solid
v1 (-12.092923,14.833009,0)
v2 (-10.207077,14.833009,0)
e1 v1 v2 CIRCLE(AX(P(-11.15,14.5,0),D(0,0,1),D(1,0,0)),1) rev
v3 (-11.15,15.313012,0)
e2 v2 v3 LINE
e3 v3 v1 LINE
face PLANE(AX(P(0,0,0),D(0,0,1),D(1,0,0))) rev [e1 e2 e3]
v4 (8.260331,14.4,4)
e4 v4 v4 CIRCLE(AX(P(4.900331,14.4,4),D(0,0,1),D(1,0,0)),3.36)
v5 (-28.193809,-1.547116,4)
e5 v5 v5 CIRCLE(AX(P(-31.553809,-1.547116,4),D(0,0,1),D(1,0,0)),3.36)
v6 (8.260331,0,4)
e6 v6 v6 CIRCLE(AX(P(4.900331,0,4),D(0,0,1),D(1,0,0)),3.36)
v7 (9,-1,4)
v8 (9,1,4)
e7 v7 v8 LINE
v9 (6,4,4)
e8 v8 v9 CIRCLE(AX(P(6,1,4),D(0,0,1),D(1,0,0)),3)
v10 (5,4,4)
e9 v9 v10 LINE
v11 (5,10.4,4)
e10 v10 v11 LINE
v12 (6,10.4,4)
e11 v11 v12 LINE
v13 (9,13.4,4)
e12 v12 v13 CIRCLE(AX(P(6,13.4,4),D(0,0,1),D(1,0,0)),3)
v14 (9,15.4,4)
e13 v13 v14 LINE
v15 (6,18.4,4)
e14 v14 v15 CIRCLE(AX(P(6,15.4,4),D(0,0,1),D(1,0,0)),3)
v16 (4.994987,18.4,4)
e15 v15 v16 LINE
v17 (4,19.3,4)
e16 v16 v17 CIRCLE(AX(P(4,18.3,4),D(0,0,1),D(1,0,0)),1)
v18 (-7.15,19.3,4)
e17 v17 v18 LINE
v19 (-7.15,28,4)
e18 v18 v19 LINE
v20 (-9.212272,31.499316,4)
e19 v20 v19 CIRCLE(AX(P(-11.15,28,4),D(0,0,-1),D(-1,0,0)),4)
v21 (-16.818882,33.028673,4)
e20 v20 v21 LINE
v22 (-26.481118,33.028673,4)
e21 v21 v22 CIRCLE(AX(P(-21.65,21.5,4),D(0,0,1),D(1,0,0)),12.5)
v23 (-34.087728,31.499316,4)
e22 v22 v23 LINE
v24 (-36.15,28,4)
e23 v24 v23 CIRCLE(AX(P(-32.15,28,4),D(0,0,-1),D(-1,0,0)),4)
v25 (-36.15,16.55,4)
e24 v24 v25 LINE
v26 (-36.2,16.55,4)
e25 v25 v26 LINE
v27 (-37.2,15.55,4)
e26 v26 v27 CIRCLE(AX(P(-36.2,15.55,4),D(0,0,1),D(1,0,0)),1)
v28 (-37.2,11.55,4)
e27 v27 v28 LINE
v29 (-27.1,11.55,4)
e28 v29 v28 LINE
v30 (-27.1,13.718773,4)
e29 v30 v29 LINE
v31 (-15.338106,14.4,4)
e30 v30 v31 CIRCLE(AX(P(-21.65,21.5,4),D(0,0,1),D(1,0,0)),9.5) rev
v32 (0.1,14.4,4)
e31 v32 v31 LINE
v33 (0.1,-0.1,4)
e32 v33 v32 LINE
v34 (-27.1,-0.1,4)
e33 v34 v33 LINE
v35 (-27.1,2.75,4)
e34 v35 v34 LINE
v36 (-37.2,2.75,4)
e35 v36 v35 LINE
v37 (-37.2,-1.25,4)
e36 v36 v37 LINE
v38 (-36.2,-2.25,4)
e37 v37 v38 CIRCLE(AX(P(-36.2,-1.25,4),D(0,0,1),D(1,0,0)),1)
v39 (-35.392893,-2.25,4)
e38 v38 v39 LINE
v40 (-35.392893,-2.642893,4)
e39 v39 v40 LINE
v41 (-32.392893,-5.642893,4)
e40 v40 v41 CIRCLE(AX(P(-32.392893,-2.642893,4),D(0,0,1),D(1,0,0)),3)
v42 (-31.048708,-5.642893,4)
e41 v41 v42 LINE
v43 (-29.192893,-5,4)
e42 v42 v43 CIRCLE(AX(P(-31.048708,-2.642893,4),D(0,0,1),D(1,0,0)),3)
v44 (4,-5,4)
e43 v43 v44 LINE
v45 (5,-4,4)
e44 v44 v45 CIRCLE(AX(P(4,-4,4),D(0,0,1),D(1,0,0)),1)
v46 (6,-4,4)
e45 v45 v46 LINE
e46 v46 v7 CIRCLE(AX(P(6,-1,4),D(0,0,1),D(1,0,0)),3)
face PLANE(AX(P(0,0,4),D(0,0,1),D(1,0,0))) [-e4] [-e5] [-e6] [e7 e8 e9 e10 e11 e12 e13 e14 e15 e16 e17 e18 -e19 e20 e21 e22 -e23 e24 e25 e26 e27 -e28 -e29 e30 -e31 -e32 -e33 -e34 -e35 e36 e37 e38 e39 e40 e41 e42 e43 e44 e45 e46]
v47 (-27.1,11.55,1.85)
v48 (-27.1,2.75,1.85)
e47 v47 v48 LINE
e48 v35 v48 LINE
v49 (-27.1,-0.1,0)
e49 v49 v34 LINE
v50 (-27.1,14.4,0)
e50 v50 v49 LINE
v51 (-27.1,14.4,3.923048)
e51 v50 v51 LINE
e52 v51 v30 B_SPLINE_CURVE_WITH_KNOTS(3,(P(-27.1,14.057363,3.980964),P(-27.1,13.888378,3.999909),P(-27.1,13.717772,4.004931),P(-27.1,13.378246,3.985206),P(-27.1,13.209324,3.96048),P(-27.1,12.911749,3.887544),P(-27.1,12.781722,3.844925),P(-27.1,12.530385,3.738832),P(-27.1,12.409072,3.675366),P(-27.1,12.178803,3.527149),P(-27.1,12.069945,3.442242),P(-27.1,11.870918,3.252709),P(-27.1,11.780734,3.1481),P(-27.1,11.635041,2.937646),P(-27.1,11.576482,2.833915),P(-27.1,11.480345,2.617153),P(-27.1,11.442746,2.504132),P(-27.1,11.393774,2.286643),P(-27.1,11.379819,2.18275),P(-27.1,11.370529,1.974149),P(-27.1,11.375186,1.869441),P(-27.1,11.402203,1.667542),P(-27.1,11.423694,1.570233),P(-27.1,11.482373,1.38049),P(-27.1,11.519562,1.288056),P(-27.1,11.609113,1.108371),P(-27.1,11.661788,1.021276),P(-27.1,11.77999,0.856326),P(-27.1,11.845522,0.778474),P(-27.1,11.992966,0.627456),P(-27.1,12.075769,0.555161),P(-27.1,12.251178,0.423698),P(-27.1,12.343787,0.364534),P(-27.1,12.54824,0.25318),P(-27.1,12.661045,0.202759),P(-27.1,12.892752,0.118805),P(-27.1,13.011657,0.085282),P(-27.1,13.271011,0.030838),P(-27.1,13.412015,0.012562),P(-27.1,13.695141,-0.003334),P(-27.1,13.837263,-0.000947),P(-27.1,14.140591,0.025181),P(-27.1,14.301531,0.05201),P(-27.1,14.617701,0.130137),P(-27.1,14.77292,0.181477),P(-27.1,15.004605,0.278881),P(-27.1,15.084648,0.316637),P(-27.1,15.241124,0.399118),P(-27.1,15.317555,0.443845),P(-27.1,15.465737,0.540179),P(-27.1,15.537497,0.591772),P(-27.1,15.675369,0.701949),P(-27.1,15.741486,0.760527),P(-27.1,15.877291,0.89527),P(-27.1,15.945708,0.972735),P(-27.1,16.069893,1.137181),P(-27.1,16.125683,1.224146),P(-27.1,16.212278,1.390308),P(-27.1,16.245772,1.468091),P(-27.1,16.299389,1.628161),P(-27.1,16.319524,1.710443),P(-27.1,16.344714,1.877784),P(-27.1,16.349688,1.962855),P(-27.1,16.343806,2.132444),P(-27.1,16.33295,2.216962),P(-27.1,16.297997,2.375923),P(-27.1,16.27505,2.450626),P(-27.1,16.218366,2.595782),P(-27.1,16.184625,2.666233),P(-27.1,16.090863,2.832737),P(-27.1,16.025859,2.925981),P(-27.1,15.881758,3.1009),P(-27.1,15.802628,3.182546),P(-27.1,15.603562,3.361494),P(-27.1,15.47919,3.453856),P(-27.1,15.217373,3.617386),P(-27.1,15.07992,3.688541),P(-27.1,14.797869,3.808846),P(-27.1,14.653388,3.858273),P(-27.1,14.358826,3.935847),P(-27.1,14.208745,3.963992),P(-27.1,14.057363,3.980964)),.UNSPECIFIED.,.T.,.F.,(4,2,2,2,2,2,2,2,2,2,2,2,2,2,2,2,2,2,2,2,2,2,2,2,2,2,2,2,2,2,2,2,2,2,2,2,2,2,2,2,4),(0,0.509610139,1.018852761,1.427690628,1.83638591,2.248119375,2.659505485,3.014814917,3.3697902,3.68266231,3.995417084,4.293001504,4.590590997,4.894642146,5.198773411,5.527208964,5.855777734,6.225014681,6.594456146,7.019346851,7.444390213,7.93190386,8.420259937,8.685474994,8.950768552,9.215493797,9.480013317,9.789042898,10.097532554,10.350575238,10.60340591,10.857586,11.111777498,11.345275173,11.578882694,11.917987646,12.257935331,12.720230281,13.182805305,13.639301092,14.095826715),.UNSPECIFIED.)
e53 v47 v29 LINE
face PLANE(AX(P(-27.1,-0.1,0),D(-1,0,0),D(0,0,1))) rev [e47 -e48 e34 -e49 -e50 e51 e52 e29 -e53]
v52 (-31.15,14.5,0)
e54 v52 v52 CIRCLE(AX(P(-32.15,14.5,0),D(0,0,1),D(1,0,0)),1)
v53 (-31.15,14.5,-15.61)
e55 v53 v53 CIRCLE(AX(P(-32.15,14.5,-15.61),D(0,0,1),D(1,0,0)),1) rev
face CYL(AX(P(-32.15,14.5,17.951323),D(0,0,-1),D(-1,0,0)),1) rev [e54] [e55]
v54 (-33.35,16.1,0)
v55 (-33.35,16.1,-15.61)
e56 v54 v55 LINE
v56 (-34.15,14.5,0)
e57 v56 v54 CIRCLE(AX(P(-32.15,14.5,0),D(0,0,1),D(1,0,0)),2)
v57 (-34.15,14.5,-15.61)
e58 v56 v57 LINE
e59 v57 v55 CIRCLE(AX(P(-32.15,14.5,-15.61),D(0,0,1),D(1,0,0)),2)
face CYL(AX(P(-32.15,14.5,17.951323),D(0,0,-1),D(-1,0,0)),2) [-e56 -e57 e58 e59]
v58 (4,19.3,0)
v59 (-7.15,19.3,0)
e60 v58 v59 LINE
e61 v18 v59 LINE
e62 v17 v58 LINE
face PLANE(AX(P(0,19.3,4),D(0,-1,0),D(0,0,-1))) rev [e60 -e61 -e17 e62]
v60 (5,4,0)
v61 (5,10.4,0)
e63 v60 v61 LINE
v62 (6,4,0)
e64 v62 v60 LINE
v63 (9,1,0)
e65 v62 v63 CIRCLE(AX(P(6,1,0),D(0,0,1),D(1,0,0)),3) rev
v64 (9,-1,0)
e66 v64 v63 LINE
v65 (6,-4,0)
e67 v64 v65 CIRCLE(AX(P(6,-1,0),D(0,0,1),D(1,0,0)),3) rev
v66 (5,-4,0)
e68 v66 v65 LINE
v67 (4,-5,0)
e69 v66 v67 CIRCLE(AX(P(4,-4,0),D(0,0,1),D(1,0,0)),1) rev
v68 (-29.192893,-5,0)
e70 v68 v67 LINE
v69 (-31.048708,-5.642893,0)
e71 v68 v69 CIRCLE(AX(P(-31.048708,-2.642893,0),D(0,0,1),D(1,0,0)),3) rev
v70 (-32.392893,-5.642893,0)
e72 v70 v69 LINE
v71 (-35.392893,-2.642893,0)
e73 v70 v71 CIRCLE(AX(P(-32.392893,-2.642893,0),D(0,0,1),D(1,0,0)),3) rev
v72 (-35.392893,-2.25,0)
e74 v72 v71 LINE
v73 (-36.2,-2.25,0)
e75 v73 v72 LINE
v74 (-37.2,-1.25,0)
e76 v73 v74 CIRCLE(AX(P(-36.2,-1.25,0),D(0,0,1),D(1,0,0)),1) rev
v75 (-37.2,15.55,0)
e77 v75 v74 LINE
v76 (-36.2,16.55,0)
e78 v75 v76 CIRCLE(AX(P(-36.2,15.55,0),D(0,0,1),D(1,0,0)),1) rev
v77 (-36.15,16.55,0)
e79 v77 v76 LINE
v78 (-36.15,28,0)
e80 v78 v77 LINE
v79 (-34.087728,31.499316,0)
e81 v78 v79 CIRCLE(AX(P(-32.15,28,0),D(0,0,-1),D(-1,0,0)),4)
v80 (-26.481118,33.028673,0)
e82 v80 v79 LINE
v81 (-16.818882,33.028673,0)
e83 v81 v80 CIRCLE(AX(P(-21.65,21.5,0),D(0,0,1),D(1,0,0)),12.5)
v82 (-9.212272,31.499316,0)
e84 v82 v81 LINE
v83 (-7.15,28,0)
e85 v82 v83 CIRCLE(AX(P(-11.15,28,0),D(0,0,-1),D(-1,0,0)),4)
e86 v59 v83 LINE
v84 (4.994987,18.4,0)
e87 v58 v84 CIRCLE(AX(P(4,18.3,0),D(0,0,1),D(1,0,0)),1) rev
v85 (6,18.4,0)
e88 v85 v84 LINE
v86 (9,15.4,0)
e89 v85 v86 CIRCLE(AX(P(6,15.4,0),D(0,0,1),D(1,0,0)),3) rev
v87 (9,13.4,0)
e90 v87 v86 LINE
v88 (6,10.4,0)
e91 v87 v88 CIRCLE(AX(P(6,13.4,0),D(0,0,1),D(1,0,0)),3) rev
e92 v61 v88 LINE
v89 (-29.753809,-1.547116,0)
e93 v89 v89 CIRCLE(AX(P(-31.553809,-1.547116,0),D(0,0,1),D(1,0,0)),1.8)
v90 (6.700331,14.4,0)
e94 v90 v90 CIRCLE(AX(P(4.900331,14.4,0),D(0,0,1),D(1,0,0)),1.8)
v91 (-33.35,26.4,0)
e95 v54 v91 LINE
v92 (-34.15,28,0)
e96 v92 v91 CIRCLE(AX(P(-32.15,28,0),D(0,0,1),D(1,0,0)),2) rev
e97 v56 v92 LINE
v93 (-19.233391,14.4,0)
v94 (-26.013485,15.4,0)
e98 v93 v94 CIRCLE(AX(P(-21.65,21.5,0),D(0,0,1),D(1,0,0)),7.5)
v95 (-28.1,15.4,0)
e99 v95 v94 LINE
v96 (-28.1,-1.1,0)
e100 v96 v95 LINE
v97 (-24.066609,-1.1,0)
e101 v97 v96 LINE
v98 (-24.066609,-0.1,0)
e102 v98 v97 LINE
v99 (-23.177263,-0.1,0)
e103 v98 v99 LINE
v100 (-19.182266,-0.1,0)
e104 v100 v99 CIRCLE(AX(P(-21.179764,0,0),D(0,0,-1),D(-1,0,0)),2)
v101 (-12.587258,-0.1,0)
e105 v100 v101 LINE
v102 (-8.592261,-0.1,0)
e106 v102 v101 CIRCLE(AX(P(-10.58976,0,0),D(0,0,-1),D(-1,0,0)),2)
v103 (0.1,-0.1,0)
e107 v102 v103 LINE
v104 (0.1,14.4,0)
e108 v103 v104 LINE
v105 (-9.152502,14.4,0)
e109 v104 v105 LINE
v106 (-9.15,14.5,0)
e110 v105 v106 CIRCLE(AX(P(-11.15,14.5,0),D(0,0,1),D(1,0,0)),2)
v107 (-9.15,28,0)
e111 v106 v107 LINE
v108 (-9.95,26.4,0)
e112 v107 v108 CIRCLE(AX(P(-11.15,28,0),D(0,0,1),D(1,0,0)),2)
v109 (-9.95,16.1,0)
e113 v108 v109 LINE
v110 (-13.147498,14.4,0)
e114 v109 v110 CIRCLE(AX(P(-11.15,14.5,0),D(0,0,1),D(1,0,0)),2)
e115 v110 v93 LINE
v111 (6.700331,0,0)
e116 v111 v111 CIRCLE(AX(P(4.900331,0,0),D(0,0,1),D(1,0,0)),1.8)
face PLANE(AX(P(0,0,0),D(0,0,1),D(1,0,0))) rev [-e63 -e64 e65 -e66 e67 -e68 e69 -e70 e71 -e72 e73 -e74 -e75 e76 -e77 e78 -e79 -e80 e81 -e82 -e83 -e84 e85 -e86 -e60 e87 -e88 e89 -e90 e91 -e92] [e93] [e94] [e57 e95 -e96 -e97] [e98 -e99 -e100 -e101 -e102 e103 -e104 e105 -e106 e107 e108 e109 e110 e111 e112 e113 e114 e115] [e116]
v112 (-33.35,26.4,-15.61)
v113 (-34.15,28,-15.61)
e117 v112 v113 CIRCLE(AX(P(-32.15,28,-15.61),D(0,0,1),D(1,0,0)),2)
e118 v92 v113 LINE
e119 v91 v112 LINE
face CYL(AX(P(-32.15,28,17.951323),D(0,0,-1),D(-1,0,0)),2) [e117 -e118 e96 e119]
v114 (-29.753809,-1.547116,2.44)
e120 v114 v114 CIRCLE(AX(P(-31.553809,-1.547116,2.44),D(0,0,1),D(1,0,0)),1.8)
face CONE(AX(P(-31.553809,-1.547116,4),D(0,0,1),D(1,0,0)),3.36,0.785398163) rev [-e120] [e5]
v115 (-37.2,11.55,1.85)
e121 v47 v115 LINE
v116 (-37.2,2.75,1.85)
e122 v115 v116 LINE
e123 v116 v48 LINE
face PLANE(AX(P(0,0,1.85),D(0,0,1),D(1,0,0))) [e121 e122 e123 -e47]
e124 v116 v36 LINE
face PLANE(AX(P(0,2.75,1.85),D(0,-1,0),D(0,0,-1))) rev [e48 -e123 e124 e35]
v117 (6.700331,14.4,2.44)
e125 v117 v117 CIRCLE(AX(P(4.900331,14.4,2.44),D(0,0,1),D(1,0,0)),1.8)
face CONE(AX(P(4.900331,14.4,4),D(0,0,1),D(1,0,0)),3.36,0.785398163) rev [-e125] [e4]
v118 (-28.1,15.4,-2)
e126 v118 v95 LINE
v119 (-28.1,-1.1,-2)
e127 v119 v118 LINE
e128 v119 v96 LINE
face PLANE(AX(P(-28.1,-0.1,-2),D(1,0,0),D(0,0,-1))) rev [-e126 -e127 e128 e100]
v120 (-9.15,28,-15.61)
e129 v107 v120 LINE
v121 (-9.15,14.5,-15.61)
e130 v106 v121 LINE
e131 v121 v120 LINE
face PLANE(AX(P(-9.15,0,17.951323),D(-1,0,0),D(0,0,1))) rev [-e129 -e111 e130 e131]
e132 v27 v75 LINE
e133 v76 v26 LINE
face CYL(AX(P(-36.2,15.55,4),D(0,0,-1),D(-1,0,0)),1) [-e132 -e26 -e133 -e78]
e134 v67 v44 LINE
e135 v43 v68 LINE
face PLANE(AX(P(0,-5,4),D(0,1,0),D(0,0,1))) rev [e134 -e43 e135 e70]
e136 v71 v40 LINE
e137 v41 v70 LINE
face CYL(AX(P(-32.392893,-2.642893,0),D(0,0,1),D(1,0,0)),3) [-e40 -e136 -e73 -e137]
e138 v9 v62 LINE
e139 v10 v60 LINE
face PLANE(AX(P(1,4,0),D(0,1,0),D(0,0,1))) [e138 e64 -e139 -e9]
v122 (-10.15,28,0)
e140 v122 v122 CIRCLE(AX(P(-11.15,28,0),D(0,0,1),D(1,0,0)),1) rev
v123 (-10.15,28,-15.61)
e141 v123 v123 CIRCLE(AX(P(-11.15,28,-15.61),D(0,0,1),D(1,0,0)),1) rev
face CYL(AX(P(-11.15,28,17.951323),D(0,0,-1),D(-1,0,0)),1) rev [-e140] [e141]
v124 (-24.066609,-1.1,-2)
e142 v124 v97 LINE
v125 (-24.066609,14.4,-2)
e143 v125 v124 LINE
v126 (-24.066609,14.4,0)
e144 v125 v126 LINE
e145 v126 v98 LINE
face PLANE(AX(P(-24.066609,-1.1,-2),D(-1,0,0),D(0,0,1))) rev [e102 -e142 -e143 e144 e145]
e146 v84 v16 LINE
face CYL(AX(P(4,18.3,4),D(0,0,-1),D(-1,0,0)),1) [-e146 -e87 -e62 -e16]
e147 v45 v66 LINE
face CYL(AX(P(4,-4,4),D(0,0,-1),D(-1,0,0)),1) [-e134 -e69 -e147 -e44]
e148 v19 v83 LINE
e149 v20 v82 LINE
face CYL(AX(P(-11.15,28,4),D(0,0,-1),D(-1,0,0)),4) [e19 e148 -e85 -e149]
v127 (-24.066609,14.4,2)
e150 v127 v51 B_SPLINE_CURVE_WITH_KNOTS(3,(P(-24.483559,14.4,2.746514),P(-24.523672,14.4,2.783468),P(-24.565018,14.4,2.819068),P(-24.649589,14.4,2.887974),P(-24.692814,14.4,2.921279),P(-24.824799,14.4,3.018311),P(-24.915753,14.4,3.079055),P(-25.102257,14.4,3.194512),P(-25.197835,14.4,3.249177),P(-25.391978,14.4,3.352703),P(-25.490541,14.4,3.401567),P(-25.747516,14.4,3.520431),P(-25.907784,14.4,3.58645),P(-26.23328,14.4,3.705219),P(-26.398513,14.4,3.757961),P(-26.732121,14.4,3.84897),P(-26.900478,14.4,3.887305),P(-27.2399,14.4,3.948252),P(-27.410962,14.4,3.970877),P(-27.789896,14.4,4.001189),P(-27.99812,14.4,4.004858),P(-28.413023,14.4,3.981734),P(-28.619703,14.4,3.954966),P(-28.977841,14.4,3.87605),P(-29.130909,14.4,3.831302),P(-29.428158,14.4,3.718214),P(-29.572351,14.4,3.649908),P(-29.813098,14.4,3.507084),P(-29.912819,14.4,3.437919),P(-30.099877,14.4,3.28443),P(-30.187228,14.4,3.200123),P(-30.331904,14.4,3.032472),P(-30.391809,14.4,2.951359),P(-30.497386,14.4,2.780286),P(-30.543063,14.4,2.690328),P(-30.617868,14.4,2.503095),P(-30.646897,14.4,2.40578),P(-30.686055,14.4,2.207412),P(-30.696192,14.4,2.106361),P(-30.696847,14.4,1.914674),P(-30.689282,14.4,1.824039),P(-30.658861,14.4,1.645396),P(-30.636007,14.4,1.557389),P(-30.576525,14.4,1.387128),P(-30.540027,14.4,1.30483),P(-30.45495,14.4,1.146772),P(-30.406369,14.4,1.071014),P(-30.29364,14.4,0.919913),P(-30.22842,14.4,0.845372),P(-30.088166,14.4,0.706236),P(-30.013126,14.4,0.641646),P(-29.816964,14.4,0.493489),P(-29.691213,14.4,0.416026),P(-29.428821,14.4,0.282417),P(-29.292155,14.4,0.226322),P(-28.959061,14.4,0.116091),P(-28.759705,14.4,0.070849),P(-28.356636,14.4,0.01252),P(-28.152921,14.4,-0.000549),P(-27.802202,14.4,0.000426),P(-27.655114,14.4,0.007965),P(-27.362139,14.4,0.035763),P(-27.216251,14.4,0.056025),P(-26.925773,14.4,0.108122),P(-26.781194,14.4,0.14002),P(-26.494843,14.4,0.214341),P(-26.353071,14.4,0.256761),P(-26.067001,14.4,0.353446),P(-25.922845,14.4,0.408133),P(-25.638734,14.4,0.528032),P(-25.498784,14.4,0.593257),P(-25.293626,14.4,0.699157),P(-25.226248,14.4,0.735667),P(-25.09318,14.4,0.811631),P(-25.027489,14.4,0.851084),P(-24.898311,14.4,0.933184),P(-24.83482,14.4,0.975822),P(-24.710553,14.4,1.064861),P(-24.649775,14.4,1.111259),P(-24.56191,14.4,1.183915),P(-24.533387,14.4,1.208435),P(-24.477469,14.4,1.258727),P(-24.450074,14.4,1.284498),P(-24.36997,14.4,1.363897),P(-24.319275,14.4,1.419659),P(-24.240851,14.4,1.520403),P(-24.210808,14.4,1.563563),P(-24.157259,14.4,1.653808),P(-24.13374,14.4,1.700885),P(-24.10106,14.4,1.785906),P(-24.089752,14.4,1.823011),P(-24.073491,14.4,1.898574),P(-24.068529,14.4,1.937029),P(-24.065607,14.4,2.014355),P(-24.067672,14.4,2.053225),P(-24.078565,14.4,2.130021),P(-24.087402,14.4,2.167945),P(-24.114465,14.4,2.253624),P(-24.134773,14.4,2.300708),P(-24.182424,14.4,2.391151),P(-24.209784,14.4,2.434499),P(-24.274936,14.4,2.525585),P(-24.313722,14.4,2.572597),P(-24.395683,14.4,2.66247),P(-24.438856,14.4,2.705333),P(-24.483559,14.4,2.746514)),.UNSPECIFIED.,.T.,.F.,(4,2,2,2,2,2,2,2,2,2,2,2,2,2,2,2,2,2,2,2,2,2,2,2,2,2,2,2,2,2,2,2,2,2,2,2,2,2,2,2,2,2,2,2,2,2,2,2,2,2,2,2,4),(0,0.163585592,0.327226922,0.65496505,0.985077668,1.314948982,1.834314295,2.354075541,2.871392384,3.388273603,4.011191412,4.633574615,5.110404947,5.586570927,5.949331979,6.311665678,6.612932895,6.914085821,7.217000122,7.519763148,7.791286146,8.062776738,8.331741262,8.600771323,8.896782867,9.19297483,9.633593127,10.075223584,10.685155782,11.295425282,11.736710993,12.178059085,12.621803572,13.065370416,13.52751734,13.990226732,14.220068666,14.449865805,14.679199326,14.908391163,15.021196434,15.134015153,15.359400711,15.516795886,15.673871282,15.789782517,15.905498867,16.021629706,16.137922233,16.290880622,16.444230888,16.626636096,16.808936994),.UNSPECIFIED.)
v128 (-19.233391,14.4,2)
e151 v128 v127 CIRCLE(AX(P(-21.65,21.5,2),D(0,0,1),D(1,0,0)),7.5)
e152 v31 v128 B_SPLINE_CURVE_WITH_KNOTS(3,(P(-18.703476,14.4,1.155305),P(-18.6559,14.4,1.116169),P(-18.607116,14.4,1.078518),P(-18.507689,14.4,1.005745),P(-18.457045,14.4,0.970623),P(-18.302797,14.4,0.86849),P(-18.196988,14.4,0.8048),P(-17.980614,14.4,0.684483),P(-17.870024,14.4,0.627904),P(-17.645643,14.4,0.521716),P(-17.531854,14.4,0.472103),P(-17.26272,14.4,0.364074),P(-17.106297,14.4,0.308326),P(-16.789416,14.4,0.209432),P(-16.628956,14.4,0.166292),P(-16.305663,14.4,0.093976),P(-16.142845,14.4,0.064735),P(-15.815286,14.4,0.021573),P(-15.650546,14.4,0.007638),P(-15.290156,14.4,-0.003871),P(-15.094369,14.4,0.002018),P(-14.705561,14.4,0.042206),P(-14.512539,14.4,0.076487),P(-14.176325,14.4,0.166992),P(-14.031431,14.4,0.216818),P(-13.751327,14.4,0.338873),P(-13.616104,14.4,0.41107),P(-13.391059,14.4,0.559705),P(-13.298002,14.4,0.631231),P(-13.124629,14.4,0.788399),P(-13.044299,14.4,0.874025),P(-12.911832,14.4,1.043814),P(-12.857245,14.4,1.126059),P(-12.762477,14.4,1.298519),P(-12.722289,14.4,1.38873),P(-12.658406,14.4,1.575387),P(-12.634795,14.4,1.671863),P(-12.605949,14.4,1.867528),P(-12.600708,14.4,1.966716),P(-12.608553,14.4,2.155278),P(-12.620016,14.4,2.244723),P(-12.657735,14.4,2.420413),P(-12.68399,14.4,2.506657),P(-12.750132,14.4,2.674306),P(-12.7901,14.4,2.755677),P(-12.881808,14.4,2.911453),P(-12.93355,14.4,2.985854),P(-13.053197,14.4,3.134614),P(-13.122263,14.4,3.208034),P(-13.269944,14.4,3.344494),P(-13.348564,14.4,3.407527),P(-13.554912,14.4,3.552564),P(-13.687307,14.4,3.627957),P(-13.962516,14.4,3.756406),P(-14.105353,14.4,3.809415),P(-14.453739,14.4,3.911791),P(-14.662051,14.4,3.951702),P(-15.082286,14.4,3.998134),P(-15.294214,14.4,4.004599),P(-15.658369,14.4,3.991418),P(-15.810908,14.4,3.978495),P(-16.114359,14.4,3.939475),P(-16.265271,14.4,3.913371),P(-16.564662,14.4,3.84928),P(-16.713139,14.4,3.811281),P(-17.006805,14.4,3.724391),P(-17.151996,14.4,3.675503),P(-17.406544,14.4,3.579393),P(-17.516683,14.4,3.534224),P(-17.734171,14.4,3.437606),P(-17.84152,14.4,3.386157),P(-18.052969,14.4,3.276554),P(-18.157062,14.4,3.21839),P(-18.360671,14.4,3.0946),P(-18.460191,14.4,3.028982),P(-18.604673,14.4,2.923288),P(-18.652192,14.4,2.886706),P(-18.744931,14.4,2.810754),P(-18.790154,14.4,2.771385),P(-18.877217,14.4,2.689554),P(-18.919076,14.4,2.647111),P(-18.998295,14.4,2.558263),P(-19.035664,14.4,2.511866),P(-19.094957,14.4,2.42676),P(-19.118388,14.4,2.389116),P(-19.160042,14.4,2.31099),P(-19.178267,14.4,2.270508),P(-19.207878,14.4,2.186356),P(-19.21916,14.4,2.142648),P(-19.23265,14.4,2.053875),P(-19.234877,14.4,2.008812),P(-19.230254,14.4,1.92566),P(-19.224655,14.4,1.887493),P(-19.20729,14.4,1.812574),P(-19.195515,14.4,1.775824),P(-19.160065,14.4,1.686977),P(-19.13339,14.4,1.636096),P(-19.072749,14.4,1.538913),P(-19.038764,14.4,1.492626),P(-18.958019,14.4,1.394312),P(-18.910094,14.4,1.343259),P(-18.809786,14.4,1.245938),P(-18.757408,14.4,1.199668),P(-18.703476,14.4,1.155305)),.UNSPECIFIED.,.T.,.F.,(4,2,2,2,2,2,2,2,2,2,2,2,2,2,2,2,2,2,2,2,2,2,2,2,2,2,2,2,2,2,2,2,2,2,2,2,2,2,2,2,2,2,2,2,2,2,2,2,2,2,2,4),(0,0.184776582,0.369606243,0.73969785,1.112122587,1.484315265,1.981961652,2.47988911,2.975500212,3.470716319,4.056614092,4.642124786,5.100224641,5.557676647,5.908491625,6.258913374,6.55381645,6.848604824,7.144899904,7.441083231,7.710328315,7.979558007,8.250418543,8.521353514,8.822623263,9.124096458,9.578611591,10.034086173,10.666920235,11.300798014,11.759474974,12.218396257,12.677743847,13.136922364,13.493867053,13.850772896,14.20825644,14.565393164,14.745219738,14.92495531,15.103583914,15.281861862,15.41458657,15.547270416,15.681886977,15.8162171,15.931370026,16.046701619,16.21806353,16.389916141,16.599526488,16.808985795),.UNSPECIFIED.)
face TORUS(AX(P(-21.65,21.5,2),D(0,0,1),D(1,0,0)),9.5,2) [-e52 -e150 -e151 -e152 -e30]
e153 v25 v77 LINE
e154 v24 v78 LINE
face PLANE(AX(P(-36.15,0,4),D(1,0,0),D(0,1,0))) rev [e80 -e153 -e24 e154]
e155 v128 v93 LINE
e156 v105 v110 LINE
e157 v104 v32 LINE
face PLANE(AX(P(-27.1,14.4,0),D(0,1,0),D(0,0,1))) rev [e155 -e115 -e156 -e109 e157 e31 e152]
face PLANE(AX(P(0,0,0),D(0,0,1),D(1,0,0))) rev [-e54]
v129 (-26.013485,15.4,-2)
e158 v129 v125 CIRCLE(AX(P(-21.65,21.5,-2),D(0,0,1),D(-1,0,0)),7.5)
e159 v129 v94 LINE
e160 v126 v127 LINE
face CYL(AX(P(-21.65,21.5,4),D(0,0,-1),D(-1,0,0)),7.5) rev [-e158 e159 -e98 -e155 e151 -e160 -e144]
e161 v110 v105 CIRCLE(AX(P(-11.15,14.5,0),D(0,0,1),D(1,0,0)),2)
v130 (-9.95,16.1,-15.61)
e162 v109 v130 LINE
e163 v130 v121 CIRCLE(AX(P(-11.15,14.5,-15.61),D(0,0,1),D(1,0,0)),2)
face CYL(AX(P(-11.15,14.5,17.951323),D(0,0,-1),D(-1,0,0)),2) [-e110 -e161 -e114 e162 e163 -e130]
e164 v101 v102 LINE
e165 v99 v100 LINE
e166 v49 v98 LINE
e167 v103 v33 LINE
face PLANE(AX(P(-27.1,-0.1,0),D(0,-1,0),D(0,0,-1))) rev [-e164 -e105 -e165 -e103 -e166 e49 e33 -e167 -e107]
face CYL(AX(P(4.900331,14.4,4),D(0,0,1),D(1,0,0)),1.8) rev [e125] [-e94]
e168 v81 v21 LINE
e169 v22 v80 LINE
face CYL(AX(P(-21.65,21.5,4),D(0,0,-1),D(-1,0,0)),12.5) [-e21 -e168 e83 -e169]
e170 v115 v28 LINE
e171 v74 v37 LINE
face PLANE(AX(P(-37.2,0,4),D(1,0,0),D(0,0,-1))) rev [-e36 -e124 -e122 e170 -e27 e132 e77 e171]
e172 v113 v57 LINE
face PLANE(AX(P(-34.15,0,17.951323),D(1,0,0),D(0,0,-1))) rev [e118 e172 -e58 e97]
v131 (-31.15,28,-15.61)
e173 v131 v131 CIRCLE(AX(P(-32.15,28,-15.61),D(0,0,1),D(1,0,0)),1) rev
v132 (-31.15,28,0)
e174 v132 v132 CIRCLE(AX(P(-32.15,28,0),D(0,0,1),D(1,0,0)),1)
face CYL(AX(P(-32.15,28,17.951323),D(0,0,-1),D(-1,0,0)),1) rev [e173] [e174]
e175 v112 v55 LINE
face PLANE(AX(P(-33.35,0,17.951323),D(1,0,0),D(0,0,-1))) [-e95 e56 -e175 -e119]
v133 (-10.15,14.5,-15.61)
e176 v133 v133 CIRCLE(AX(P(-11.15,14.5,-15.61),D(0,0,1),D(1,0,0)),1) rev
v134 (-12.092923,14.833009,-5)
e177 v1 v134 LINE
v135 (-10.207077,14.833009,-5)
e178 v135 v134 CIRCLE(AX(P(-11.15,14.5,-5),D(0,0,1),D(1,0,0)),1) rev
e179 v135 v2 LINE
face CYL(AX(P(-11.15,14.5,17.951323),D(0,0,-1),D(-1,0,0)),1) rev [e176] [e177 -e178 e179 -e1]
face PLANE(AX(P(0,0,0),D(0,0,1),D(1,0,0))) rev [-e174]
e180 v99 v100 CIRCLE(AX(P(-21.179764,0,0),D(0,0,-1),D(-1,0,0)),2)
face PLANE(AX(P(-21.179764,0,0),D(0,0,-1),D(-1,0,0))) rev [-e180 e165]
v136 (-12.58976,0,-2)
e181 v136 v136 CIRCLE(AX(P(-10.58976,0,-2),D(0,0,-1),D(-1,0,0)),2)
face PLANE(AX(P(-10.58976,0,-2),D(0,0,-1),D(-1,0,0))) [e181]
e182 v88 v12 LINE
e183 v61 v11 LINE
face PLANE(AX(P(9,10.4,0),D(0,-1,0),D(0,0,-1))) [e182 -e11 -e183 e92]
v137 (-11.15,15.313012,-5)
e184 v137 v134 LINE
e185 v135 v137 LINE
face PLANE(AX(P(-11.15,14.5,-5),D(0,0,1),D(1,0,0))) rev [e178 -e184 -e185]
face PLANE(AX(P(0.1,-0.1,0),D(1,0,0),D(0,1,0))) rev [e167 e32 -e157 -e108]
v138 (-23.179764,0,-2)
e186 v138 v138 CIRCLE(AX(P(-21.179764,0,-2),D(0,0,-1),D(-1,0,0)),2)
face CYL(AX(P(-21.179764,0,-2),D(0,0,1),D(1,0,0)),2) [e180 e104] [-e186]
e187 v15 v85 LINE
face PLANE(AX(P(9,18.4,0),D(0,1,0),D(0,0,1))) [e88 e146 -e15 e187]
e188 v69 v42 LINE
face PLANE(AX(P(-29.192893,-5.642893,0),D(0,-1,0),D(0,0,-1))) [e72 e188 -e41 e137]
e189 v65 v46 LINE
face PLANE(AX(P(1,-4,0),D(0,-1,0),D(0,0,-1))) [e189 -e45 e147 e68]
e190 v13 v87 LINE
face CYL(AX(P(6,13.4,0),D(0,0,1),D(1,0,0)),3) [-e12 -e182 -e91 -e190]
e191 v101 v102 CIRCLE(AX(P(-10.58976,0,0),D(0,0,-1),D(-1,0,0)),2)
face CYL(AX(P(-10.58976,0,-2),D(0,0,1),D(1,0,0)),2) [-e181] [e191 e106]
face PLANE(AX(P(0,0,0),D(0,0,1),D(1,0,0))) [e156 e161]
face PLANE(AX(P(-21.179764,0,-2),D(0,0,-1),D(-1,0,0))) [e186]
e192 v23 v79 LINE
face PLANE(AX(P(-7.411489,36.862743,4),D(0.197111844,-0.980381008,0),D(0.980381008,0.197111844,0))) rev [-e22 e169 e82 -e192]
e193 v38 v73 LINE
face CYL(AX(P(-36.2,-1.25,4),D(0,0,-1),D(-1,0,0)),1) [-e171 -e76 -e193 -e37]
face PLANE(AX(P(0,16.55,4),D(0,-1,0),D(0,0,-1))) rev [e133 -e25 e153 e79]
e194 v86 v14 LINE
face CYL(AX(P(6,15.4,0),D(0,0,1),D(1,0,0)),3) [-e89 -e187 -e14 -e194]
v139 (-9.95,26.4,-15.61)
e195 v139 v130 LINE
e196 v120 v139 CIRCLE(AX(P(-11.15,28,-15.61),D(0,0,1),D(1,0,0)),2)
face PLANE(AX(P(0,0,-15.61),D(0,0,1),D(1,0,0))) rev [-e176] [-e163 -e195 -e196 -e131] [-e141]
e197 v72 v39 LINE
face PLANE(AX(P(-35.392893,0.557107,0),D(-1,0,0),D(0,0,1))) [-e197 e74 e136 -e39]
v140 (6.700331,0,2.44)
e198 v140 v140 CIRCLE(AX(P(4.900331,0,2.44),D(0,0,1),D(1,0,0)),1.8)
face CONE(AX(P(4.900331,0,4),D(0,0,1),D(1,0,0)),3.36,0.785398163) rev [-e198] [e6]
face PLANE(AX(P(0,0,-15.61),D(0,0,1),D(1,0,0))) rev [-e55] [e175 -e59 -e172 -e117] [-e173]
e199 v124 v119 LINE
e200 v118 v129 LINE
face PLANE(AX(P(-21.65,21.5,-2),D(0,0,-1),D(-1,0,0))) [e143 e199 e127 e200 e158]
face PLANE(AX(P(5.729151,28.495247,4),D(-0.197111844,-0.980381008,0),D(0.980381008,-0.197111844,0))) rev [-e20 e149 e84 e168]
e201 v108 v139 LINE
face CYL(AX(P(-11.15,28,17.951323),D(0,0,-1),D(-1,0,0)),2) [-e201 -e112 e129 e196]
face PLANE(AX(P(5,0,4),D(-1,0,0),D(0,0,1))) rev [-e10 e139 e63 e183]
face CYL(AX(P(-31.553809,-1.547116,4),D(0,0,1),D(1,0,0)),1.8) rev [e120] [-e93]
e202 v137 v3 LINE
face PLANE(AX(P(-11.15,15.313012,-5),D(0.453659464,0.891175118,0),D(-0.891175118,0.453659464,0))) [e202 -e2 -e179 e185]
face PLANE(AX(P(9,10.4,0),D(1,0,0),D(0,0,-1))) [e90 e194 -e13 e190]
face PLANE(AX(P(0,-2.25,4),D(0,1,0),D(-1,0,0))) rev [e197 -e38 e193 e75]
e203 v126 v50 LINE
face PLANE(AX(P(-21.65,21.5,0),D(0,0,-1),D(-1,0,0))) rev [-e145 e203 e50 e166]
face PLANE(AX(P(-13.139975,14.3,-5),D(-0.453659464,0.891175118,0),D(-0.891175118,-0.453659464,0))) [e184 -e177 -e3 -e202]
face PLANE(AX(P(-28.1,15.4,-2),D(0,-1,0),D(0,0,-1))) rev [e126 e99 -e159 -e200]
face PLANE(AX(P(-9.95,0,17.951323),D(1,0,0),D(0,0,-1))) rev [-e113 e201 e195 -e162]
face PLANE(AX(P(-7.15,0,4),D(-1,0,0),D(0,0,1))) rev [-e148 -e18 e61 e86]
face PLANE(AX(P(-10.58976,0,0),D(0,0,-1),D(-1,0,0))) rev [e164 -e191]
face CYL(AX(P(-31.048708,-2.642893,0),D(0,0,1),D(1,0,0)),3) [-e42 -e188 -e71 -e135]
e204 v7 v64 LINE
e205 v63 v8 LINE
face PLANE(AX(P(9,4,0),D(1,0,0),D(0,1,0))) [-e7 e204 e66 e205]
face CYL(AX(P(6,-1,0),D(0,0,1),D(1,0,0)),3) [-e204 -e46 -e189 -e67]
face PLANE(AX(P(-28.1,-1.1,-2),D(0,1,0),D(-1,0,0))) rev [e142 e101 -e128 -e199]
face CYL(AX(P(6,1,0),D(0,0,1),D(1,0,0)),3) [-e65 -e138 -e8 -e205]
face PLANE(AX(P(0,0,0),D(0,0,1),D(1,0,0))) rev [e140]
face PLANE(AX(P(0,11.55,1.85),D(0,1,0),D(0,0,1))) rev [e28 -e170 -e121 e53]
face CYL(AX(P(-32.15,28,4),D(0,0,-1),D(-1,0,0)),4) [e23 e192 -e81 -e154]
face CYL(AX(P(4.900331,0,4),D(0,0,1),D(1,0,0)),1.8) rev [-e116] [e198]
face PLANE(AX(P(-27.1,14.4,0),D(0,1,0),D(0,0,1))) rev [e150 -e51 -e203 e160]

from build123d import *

# Parameters (mm, degrees)
BOSS_EXTRUDE1_DEPTH                                  = 4
SKETCH5_W                                            = 5.2
SKETCH5_H                                            = 8.8
SKETCH5_W_2                                          = 5
CUT_EXTRUDE1_DEPTH                                   = 2.15
FILLET1_R                                            = 1
BOSS_EXTRUDE2_OUTLINE_R                              = 1
BOSS_EXTRUDE2_DEPTH                                  = 15.61
BOSS_EXTRUDE5_START                                  = -5
BOSS_EXTRUDE5_DEPTH                                  = 5
BOSS_EXTRUDE8_DEPTH                                  = 4
FILLET3_R                                            = 2
SKETCH9_R                                            = 2
BOSS_EXTRUDE9_DEPTH                                  = 2
SKETCH10_W                                           = 27.2
SKETCH10_H                                           = 14.5
SKETCH10_W_2                                         = 27
SKETCH10_H_2                                         = 14.3
CUT_EXTRUDE4_DEPTH                                   = 4
BOSS_EXTRUDE10_START                                 = 2
BOSS_EXTRUDE10_DEPTH                                 = 2
SKETCH12_W                                           = 8
SKETCH12_H                                           = 8
SKETCH12_W_2                                         = 6.2
SKETCH12_H_2                                         = 6.2
BOSS_EXTRUDE11_DEPTH                                 = 4
FILLET4_R                                            = 3
FILLET5_R                                            = 3
CSK_FOR_M3_HEX_SOCKET_COUNTERSUNK_CAP_SC_D           = 3.6
CSK_FOR_M3_HEX_SOCKET_COUNTERSUNK_CAP_SC_DEPTH       = 14.44
CSK_FOR_M3_HEX_SOCKET_COUNTERSUNK_CAP_SC_CSINK_D     = 6.72
CSK_FOR_M3_HEX_SOCKET_COUNTERSUNK_CAP_SC_CSINK_ANGLE = 90
CSK_FOR_M3_HEX_SOCKET_COUNTERSUNK_CAP_SC_TIP         = 1.081549114


# Read off the part's stored shape, not the designer's step: Boss-Extrude2
with BuildPart() as part:
    # Sketch3 → Boss-Extrude1 (new body)
    with BuildSketch(Plane.XY):
        with BuildLine():
            Line((5, 19.3), (-9.345122918, 19.3))
            ThreePointArc((-9.345122918, 19.3), (-23.0857932, 33.91726612), (-33.128131381, 16.55))
            Line((-33.128131381, 16.55), (-37.2, 16.55))
            Line((-37.2, 16.55), (-37.2, -2.25))
            Line((-37.2, -2.25), (-32, -2.25))
            Line((-32, -2.25), (-32, -5))
            Line((-32, -5), (5, -5))
            Line((5, -5), (5, 19.3))
        make_face()
        with BuildLine():
            ThreePointArc((-23.75, 14.3), (-25.677557149, 15.173169561), (-27.284491991, 16.55))
            ThreePointArc((-27.284491991, 16.55), (-19.55505766, 28.701473224), (-19.55, 14.3))
            Line((-19.55, 14.3), (0, 14.3))
            Line((0, 14.3), (0, 0))
            Line((0, 0), (-27, 0))
            Line((-27, 0), (-27, 14.3))
            Line((-27, 14.3), (-23.75, 14.3))
        make_face(mode=Mode.SUBTRACT)
    extrude(amount=BOSS_EXTRUDE1_DEPTH)

    # Sketch5 → Cut-Extrude1 (cut)
    with BuildSketch(Plane.XY.offset(4)):
        with Locations((-29.6, 7.15)):
            Rectangle(SKETCH5_W, SKETCH5_H)
        with Locations((-34.7, 7.15)):
            Rectangle(SKETCH5_W_2, SKETCH5_H)
    extrude(amount=-CUT_EXTRUDE1_DEPTH, mode=Mode.SUBTRACT)

    # Fillet1
    fillet1_edges = [part.edges().sort_by_distance(p)[0] for p in [
        (5, 19.3, 2),
        (5, -5, 2),
        (-32, -5, 2),
        (-32, -2.25, 2),
        (-37.2, -2.25, 2),
        (-37.2, 16.55, 2),
    ]]
    fillet(fillet1_edges, radius=FILLET1_R)

    # Boss-Extrude2 outline → Boss-Extrude2 (add)
    # profile 1 of 2: a face of its own
    with BuildSketch(Plane.XY.offset(-15.61)):
        with BuildLine():
            ThreePointArc((-9.15, 28), (-12.938854382, 28.894427191), (-9.95, 26.4))
            Line((-9.95, 26.4), (-9.95, 16.1))
            ThreePointArc((-9.95, 16.1), (-12.938854382, 13.605572809), (-9.15, 14.5))
            Line((-9.15, 14.5), (-9.15, 28))
        make_face()
        with Locations((-11.15, 14.5)):
            Circle(BOSS_EXTRUDE2_OUTLINE_R, mode=Mode.SUBTRACT)
        with Locations((-11.15, 28)):
            Circle(BOSS_EXTRUDE2_OUTLINE_R, mode=Mode.SUBTRACT)
    # profile 2 of 2: a face of its own
    with BuildSketch(Plane.XY.offset(-15.61)):
        with BuildLine():
            ThreePointArc((-33.35, 26.4), (-30.361145618, 28.894427191), (-34.15, 28))
            Line((-34.15, 28), (-34.15, 14.5))
            ThreePointArc((-34.15, 14.5), (-30.361145618, 13.605572809), (-33.35, 16.1))
            Line((-33.35, 16.1), (-33.35, 26.4))
        make_face()
        with Locations((-32.15, 14.5)):
            Circle(BOSS_EXTRUDE2_OUTLINE_R, mode=Mode.SUBTRACT)
        with Locations((-32.15, 28)):
            Circle(BOSS_EXTRUDE2_OUTLINE_R, mode=Mode.SUBTRACT)
    extrude(amount=BOSS_EXTRUDE2_DEPTH)

    # Sketch7 → Boss-Extrude5 (add)
    with BuildSketch(Plane.XY.offset(BOSS_EXTRUDE5_START)):
        with BuildLine():
            Line((-13.139974874, 14.3), (-11.15, 15.313011827))
            Line((-11.15, 15.313011827), (-9.160025126, 14.3))
            ThreePointArc((-9.160025126, 14.3), (-11.15, 12.5), (-13.139974874, 14.3))
        make_face()
    extrude(amount=BOSS_EXTRUDE5_DEPTH)

    # Sketch8 → Boss-Extrude8 (add)
    with BuildSketch(Plane(origin=(0, 0, 0), x_dir=(-1, 0, 0), z_dir=(0, 0, -1))):
        with BuildLine():
            ThreePointArc((12.211302304, 29.695180645), (14.32299851, 31.627440405), (16.818882283, 33.02867302))
            Line((16.818882283, 33.02867302), (9.212271747, 31.499315535))
            ThreePointArc((9.212271747, 31.499315535), (7.703921576, 30.030897214), (7.15, 28))
            Line((7.15, 28), (7.15, 21.5))
            Line((7.15, 21.5), (7.15, 19.3))
            Line((7.15, 19.3), (9.15, 19.3))
            Line((9.15, 19.3), (9.15, 21.5))
            Line((9.15, 21.5), (9.15, 28))
            ThreePointArc((9.15, 28), (10.181135873, 29.749657768), (12.211302304, 29.695180645))
        make_face()
        with BuildLine():
            Line((9.15, 19.3), (9.95, 19.3))
            Line((9.95, 19.3), (9.95, 25.9))
            ThreePointArc((9.95, 25.9), (10.02628451, 26.097742729), (10.105910811, 26.294163617))
            ThreePointArc((10.105910811, 26.294163617), (12.850530293, 26.947290771), (12.211302304, 29.695180645))
            ThreePointArc((12.211302304, 29.695180645), (10.181135873, 29.749657768), (9.15, 28))
            Line((9.15, 28), (9.15, 21.5))
            Line((9.15, 21.5), (9.15, 19.3))
        make_face()
        with BuildLine():
            Line((34.15, 28), (34.15, 21.5))
            Line((34.15, 21.5), (34.15, 16.55))
            Line((34.15, 16.55), (36.15, 16.55))
            Line((36.15, 16.55), (36.15, 21.5))
            Line((36.15, 21.5), (36.15, 28))
            ThreePointArc((36.15, 28), (35.596078424, 30.030897214), (34.087728253, 31.499315535))
            Line((34.087728253, 31.499315535), (26.481117717, 33.02867302))
            ThreePointArc((26.481117717, 33.02867302), (28.97700149, 31.627440405), (31.088697696, 29.695180645))
            ThreePointArc((31.088697696, 29.695180645), (33.118864127, 29.749657768), (34.15, 28))
        make_face()
        with BuildLine():
            Line((33.35, 21.5), (34.15, 21.5))
            Line((34.15, 21.5), (34.15, 28))
            ThreePointArc((34.15, 28), (33.118864127, 29.749657768), (31.088697696, 29.695180645))
            ThreePointArc((31.088697696, 29.695180645), (30.449469707, 26.947290771), (33.194089189, 26.294163617))
            ThreePointArc((33.194089189, 26.294163617), (33.27371549, 26.097742729), (33.35, 25.9))
            Line((33.35, 25.9), (33.35, 21.5))
        make_face()
        with BuildLine():
            Line((34.15, 16.55), (34.15, 21.5))
            Line((34.15, 21.5), (33.35, 21.5))
            Line((33.35, 21.5), (33.35, 17.1))
            ThreePointArc((33.35, 17.1), (33.242328005, 16.82368399), (33.128131381, 16.55))
            Line((33.128131381, 16.55), (33.35, 16.55))
            Line((33.35, 16.55), (33.35, 16.1))
            ThreePointArc((33.35, 16.1), (30.361145618, 13.605572809), (34.15, 14.5))
            Line((34.15, 14.5), (34.15, 16.55))
        make_face()
        with BuildLine():
            Line((29.15, 21.5), (33.35, 21.5))
            Line((33.35, 21.5), (33.35, 25.9))
            ThreePointArc((33.35, 25.9), (33.27371549, 26.097742729), (33.194089189, 26.294163617))
            ThreePointArc((33.194089189, 26.294163617), (30.449469707, 26.947290771), (31.088697696, 29.695180645))
            ThreePointArc((31.088697696, 29.695180645), (28.97700149, 31.627440405), (26.481117717, 33.02867302))
            Line((26.481117717, 33.02867302), (21.65, 34))
            Line((21.65, 34), (16.818882283, 33.02867302))
            ThreePointArc((16.818882283, 33.02867302), (14.32299851, 31.627440405), (12.211302304, 29.695180645))
            ThreePointArc((12.211302304, 29.695180645), (12.850530293, 26.947290771), (10.105910811, 26.294163617))
            ThreePointArc((10.105910811, 26.294163617), (10.02628451, 26.097742729), (9.95, 25.9))
            Line((9.95, 25.9), (9.95, 19.3))
            Line((9.95, 19.3), (14.479923292, 19.3))
            ThreePointArc((14.479923292, 19.3), (20.537699526, 28.917060581), (29.15, 21.5))
        make_face()
    extrude(amount=-BOSS_EXTRUDE8_DEPTH)

    # Fillet3
    fillet3_edges = [part.edges().sort_by_distance(p)[0] for p in [
        (-20.537699526, 28.917060581, 4),
    ]]
    fillet(fillet3_edges, radius=FILLET3_R)

    # Sketch9 → Boss-Extrude9 (add)
    with BuildSketch(Plane(origin=(0, 0, 0), x_dir=(-1, 0, 0), z_dir=(0, 0, -1))):
        with Locations((10.589759588, 0)):
            Circle(SKETCH9_R)
        with Locations((21.179764077, 0)):
            Circle(SKETCH9_R)
    extrude(amount=BOSS_EXTRUDE9_DEPTH)

    # Sketch10 → Cut-Extrude4 (cut)
    with BuildSketch(Plane.XY.offset(4)):
        with Locations((-13.5, 7.15)):
            Rectangle(SKETCH10_W, SKETCH10_H)
        with Locations((-13.5, 7.15)):
            Rectangle(SKETCH10_W_2, SKETCH10_H_2, mode=Mode.SUBTRACT)
    extrude(amount=-CUT_EXTRUDE4_DEPTH, mode=Mode.SUBTRACT)

    # Sketch11 → Boss-Extrude10 (add)
    with BuildSketch(Plane(origin=(0, 0, 0), x_dir=(-1, 0, 0), z_dir=(0, 0, -1)).offset(BOSS_EXTRUDE10_START)):
        with BuildLine():
            Line((24.066609195, -0.1), (24.066609195, 14.4))
            ThreePointArc((24.066609195, 14.4), (25.07672129, 14.828599757), (26.013484846, 15.4))
            Line((26.013484846, 15.4), (28.1, 15.4))
            Line((28.1, 15.4), (28.1, -0.1))
            Line((28.1, -0.1), (28.1, -1.1))
            Line((28.1, -1.1), (24.066609195, -1.1))
            Line((24.066609195, -1.1), (24.066609195, -0.1))
        make_face()
    extrude(amount=-BOSS_EXTRUDE10_DEPTH)

    # Sketch12 → Boss-Extrude11 (add)
    with BuildSketch(Plane.XY.offset(4)):
        with Locations((5, 0)):
            Rectangle(SKETCH12_W, SKETCH12_H)
        with Locations((5, 14.4)):
            Rectangle(SKETCH12_W, SKETCH12_H)
        with Locations((-32.292893219, -2.542893219)):
            Rectangle(SKETCH12_W_2, SKETCH12_H_2)
    extrude(amount=-BOSS_EXTRUDE11_DEPTH)

    # Fillet4
    fillet4_edges = [part.edges().sort_by_distance(p)[0] for p in [
        (9, 4, 2),
        (9, -4, 2),
        (9, 10.4, 2),
        (9, 18.4, 2),
        (-35.392893219, -5.642893219, 2),
    ]]
    fillet(fillet4_edges, radius=FILLET4_R)

    # Fillet5
    # the kernel refuses this fillet: 3 mm, written as the material it takes off along each edge
    with BuildSketch(Plane(origin=(-29.192893219, -5.642893219, 8.63953636), x_dir=(-1, 0, 0), z_dir=(0, 0, -1))) as fillet5_piece_1:
        with BuildLine():
            CenterArc((1.855814544, 3), FILLET5_R, 231.785675488, 38.214324512)
            Line((0, 0.642893219), (-0.037116291, 0.595751083))
            ThreePointArc((-0.037116291, 0.595751083), (-0.06, 0.321446609), (-0.06, 0))
            Line((-0.06, 0), (0, -0.06))
            Line((0, -0.06), (1.855814544, -0.06))
            Line((1.855814544, -0.06), (1.855814544, 0))
        make_face()
    extrude(amount=13.27907272, mode=Mode.SUBTRACT)

    # CSK for M3 Hex Socket Countersunk Cap Screw1
    with Locations(Plane.XY.offset(4)):
        with Locations((4.900331387, 0), (4.900331387, 14.4), (-31.553809286, -1.547116477)):
            CounterSinkHole(CSK_FOR_M3_HEX_SOCKET_COUNTERSUNK_CAP_SC_D / 2, CSK_FOR_M3_HEX_SOCKET_COUNTERSUNK_CAP_SC_CSINK_D / 2, depth=CSK_FOR_M3_HEX_SOCKET_COUNTERSUNK_CAP_SC_DEPTH, counter_sink_angle=CSK_FOR_M3_HEX_SOCKET_COUNTERSUNK_CAP_SC_CSINK_ANGLE)
            with Locations((0, 0, -(CSK_FOR_M3_HEX_SOCKET_COUNTERSUNK_CAP_SC_DEPTH + CSK_FOR_M3_HEX_SOCKET_COUNTERSUNK_CAP_SC_TIP / 2))):  # 118° drill point
                Cone(0, CSK_FOR_M3_HEX_SOCKET_COUNTERSUNK_CAP_SC_D / 2, CSK_FOR_M3_HEX_SOCKET_COUNTERSUNK_CAP_SC_TIP, mode=Mode.SUBTRACT)


solid = part.part
